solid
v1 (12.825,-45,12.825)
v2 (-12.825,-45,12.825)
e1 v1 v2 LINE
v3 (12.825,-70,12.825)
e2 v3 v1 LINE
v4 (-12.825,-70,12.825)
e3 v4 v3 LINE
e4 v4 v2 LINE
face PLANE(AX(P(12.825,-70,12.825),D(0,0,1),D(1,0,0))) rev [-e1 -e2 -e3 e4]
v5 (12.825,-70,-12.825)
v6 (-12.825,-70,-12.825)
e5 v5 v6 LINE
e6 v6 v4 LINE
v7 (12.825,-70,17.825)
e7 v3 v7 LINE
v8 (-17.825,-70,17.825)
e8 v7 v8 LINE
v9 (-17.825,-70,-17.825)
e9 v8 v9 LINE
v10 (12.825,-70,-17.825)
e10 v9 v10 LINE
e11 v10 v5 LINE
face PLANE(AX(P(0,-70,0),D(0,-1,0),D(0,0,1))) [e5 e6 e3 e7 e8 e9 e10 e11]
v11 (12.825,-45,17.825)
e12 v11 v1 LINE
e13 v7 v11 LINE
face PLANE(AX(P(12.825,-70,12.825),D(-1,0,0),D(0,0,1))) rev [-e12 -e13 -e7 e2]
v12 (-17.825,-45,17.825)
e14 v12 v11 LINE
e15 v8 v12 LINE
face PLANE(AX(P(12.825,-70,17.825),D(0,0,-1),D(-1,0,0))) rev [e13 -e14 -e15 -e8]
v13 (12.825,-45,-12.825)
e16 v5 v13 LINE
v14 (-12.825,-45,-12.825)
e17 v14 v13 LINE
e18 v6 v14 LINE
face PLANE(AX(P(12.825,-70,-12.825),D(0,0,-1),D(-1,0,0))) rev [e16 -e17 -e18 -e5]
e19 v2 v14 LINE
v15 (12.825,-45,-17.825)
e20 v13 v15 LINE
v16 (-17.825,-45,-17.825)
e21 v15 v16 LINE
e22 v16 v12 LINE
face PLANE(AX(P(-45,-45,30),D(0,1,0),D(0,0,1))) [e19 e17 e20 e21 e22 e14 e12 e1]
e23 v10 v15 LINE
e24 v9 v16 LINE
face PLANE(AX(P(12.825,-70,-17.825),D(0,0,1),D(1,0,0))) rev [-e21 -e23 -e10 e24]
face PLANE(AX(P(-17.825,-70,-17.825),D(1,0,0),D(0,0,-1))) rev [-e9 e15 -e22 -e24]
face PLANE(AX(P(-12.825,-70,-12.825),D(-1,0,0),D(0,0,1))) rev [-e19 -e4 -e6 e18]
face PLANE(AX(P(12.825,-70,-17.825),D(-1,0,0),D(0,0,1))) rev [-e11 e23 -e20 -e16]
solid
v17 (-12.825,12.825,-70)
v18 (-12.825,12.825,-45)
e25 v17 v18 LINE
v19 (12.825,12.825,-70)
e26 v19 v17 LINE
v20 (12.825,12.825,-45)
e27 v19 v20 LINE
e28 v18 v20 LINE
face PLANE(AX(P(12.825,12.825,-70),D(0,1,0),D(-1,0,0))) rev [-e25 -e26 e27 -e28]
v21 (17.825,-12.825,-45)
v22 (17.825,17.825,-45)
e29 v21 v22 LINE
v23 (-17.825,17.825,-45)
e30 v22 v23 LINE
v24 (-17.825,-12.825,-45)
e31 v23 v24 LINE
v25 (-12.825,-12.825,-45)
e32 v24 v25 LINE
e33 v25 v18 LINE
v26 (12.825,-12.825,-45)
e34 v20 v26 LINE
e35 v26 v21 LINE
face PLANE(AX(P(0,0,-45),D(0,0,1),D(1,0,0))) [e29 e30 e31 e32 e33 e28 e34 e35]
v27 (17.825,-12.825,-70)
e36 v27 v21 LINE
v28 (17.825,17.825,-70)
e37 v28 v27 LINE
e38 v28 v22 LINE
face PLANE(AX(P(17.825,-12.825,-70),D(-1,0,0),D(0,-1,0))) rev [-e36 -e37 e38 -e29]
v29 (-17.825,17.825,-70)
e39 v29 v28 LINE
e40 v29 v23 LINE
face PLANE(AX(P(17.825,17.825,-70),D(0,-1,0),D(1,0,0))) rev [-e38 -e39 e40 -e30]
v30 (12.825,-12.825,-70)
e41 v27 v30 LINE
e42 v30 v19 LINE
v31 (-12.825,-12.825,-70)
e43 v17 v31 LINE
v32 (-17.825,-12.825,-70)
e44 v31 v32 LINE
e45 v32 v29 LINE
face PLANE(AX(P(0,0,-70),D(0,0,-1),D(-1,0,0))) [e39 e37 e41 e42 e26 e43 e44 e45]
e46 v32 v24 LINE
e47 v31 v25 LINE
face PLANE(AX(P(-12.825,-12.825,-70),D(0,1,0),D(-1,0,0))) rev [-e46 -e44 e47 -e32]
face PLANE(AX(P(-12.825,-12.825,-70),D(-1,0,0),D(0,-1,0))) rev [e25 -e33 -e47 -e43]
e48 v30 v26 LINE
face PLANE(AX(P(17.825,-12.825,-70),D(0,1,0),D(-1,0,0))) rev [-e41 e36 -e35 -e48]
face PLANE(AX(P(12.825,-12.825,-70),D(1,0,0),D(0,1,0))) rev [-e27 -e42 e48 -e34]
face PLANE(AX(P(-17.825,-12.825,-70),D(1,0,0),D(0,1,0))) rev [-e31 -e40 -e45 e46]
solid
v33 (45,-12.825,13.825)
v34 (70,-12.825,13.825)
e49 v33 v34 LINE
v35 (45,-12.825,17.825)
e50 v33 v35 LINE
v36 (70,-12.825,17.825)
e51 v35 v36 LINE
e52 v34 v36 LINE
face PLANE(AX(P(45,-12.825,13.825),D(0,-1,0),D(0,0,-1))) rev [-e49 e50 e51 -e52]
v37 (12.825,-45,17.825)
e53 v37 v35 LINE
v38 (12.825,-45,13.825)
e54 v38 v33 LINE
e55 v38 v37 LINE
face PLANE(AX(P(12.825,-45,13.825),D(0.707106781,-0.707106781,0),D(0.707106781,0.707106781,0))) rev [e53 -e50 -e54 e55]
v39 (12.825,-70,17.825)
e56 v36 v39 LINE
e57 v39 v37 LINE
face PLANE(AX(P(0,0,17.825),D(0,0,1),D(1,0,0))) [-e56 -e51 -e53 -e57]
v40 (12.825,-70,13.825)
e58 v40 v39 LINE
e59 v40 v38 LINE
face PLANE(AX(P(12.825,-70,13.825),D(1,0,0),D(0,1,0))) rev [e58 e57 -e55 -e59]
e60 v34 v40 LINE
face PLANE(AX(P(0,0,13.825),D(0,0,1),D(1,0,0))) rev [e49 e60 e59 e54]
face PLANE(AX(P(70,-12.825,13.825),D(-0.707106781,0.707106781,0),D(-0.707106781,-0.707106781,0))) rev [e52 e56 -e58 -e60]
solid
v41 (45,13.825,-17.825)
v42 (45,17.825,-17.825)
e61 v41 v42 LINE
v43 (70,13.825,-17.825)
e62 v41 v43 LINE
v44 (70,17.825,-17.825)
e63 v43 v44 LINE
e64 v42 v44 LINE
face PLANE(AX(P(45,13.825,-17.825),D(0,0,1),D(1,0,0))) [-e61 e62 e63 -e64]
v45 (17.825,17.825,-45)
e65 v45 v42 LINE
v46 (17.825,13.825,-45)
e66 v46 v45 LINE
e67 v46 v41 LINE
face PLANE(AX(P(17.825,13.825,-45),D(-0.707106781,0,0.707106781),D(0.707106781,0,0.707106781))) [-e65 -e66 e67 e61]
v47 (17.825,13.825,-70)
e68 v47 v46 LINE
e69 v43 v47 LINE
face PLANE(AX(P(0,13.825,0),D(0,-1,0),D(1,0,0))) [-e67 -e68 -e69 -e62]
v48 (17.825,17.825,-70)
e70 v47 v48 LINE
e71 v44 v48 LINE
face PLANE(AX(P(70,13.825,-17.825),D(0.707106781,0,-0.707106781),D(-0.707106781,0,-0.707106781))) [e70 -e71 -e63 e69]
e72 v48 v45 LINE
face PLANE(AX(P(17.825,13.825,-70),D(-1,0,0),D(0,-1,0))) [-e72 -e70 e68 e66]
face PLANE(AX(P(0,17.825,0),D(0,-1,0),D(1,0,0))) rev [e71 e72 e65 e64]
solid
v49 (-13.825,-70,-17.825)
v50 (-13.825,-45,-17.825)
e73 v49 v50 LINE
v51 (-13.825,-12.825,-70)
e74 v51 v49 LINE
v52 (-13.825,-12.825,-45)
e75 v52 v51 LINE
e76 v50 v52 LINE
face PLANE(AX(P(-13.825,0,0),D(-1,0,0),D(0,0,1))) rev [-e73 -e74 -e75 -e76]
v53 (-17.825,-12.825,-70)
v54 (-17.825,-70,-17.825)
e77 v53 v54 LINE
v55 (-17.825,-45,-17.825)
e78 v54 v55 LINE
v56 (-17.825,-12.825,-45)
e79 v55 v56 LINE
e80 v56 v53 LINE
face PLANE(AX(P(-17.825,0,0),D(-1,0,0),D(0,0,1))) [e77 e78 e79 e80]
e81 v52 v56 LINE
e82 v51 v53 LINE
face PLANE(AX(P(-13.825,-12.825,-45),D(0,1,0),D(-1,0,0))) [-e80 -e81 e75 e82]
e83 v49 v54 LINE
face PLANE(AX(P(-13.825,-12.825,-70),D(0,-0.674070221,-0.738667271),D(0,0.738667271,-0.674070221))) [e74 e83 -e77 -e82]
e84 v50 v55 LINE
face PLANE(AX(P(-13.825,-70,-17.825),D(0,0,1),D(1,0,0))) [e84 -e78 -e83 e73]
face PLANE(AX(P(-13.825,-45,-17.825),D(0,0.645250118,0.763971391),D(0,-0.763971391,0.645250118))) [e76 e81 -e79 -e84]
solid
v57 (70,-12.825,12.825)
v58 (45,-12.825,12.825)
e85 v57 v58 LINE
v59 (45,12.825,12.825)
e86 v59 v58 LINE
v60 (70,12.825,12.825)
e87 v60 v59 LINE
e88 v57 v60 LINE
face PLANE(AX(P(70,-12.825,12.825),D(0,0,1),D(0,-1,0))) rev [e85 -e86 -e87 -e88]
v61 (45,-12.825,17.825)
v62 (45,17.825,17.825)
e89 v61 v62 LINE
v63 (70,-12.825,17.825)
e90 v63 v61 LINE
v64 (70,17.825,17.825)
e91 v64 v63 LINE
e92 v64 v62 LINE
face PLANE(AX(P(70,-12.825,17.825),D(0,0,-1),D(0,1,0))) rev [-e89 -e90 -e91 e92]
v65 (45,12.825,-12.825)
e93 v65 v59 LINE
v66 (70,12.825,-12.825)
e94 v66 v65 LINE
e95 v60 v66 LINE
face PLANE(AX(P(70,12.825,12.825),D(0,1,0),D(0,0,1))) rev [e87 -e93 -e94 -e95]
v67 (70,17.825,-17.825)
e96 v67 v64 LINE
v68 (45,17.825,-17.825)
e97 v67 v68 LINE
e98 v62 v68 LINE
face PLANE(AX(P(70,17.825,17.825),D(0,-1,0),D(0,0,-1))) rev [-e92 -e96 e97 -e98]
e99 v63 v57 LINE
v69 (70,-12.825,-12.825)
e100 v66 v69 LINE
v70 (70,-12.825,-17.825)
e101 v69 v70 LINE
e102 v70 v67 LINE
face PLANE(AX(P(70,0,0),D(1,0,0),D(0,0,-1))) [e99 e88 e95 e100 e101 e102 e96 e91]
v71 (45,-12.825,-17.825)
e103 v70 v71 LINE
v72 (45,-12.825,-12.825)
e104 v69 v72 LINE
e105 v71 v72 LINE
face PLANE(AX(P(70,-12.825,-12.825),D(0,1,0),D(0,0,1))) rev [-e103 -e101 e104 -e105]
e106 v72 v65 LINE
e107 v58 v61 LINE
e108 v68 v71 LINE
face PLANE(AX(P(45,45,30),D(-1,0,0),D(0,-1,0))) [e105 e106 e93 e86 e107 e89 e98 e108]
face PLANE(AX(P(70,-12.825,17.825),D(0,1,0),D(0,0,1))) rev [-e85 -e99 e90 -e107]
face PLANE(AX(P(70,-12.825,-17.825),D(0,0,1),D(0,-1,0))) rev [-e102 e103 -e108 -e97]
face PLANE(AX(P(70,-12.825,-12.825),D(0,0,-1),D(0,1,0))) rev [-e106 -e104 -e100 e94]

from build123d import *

# Parameters (mm, degrees)
C_START                                 = -12.825
C_CHANNEL_IGVC_5MM_CORNER_3_OUTLINE_W   = 52.175
C_CHANNEL_IGVC_5MM_CORNER_3_OUTLINE_H   = 5
C_CHANNEL_IGVC_5MM_CORNER_3_OUTLINE_W_2 = 57.175
C_CHANNEL_IGVC_5MM_CORNER_3_DEPTH       = 30.65
C_START_2                               = 12.825
C_CHANNEL_IGVC_5MM_CORNER_3_2_DEPTH     = 5
C_START_3                               = -70
C_CHANNEL_IGVC_5MM_CORNER_3_3_DEPTH     = 57.175
C_CHANNEL_IGVC_5MM_CORNER_3_4_OUTLINE_W = 5
C_CHANNEL_IGVC_5MM_CORNER_3_4_OUTLINE_H = 70
C_CHANNEL_IGVC_5MM_CORNER_3_4_DEPTH     = 30.65
C_CHANNEL_IGVC_5MM_CORNER_3_5_OUTLINE_W = 25.65
C_CHANNEL_IGVC_5MM_CORNER_3_5_OUTLINE_H = 70
C_CHANNEL_IGVC_5MM_CORNER_3_5_DEPTH     = 5
CUT_EXTRUDE1_DEPTH                      = 30
CUT_EXTRUDE1_DEPTH_BACK                 = 45
SKETCH16_W                              = 90
SKETCH16_H                              = 90
BOSS_EXTRUDE1_DEPTH                     = 4
BOSS_EXTRUDE2_DEPTH                     = 4
BOSS_EXTRUDE3_DEPTH                     = 4


# Read off the part's stored shape, not the designer's step: C channel IGVC_5MM_CORNER(3)
with BuildPart() as part:
    # C channel IGVC_5MM_CORNER(3) outline → C channel IGVC_5MM_CORNER(3) (new body)
    with BuildSketch(Plane(origin=(0, 0, 0), x_dir=(1, 0, 0), z_dir=(0, 1, 0)).offset(C_START)):
        with Locations((43.9125, 15.325)):
            Rectangle(C_CHANNEL_IGVC_5MM_CORNER_3_OUTLINE_W, C_CHANNEL_IGVC_5MM_CORNER_3_OUTLINE_H)
        with Locations((41.4125, -15.325)):
            Rectangle(C_CHANNEL_IGVC_5MM_CORNER_3_OUTLINE_W_2, C_CHANNEL_IGVC_5MM_CORNER_3_OUTLINE_H)
    extrude(amount=C_CHANNEL_IGVC_5MM_CORNER_3_DEPTH)

    # C channel IGVC_5MM_CORNER_3 2 outline → C channel IGVC_5MM_CORNER_3 2 (add)
    with BuildSketch(Plane(origin=(0, 0, 0), x_dir=(1, 0, 0), z_dir=(0, 1, 0)).offset(C_START_2)):
        Polygon((70, -12.825), (70, 12.825), (17.825, 12.825), (17.825, 0), (-12.825, 0), (-12.825, -12.825), align=None)
    extrude(amount=C_CHANNEL_IGVC_5MM_CORNER_3_2_DEPTH)


with BuildPart() as body_2:
    # C channel IGVC_5MM_CORNER_3 3 outline → C channel IGVC_5MM_CORNER_3 3 (new body)
    with BuildSketch(Plane(origin=(0, 0, 0), x_dir=(1, 0, 0), z_dir=(0, 1, 0)).offset(C_START_3)):
        Polygon((-17.825, -17.825), (12.825, -17.825), (12.825, -12.825), (-12.825, -12.825), (-12.825, 12.825), (12.825, 12.825), (12.825, 17.825), (-17.825, 17.825), align=None)
    extrude(amount=C_CHANNEL_IGVC_5MM_CORNER_3_3_DEPTH)


with BuildPart() as body_3:
    # C channel IGVC_5MM_CORNER_3 4 outline → C channel IGVC_5MM_CORNER_3 4 (new body)
    with BuildSketch(Plane(origin=(0, 0, 0), x_dir=(1, 0, 0), z_dir=(0, 1, 0)).offset(C_START)):
        with Locations((-15.325, 35)):
            Rectangle(C_CHANNEL_IGVC_5MM_CORNER_3_4_OUTLINE_W, C_CHANNEL_IGVC_5MM_CORNER_3_4_OUTLINE_H)
        with Locations((15.325, 35)):
            Rectangle(C_CHANNEL_IGVC_5MM_CORNER_3_4_OUTLINE_W, C_CHANNEL_IGVC_5MM_CORNER_3_4_OUTLINE_H)
    extrude(amount=C_CHANNEL_IGVC_5MM_CORNER_3_4_DEPTH)

    # C channel IGVC_5MM_CORNER_3 5 outline → C channel IGVC_5MM_CORNER_3 5 (add)
    with BuildSketch(Plane(origin=(0, 0, 0), x_dir=(1, 0, 0), z_dir=(0, 1, 0)).offset(C_START_2)):
        with Locations((0, 35)):
            Rectangle(C_CHANNEL_IGVC_5MM_CORNER_3_5_OUTLINE_W, C_CHANNEL_IGVC_5MM_CORNER_3_5_OUTLINE_H)
    extrude(amount=C_CHANNEL_IGVC_5MM_CORNER_3_5_DEPTH)


with BuildPart() as cut_extrude1_tool:
    # Sketch16 → Cut-Extrude1 (new, two sides: drawn at the far end of the back side and taken through both)
    with BuildSketch(Plane.XY.offset(-CUT_EXTRUDE1_DEPTH_BACK)):
        Rectangle(SKETCH16_W, SKETCH16_H)
    extrude(amount=CUT_EXTRUDE1_DEPTH + CUT_EXTRUDE1_DEPTH_BACK)


with BuildPart() as part_1:
    add(part.part)

    # Cut-Extrude1: cut by cut_extrude1_tool
    add(cut_extrude1_tool.part, mode=Mode.SUBTRACT)


with BuildPart() as body_2_1:
    add(body_2.part)

    # Cut-Extrude1: cut by cut_extrude1_tool
    add(cut_extrude1_tool.part, mode=Mode.SUBTRACT)


with BuildPart() as body_3_1:
    add(body_3.part)

    # Cut-Extrude1: cut by cut_extrude1_tool
    add(cut_extrude1_tool.part, mode=Mode.SUBTRACT)


with BuildPart() as body_4:
    # Sketch22 → Boss-Extrude1 (new body)
    with BuildSketch(Plane(origin=(0, 17.825, 0), x_dir=(1, 0, 0), z_dir=(0, 1, 0))):
        Polygon((17.825, 45), (45, 17.825), (70, 17.825), (17.825, 70), align=None)
    extrude(amount=-BOSS_EXTRUDE1_DEPTH)


with BuildPart() as body_5:
    # Sketch21 → Boss-Extrude2 (new body)
    with BuildSketch(Plane.ZY.offset(17.825)):
        Polygon((-17.825, -45), (-45, -12.825), (-70, -12.825), (-17.825, -70), align=None)
    extrude(amount=-BOSS_EXTRUDE2_DEPTH)


with BuildPart() as body_6:
    # Sketch20 → Boss-Extrude3 (new body)
    with BuildSketch(Plane.XY.offset(17.825)):
        Polygon((12.825, -45), (45, -12.825), (70, -12.825), (12.825, -70), align=None)
    extrude(amount=-BOSS_EXTRUDE3_DEPTH)


solid = Compound([part_1.part, body_2_1.part, body_3_1.part, body_4.part, body_5.part, body_6.part])
